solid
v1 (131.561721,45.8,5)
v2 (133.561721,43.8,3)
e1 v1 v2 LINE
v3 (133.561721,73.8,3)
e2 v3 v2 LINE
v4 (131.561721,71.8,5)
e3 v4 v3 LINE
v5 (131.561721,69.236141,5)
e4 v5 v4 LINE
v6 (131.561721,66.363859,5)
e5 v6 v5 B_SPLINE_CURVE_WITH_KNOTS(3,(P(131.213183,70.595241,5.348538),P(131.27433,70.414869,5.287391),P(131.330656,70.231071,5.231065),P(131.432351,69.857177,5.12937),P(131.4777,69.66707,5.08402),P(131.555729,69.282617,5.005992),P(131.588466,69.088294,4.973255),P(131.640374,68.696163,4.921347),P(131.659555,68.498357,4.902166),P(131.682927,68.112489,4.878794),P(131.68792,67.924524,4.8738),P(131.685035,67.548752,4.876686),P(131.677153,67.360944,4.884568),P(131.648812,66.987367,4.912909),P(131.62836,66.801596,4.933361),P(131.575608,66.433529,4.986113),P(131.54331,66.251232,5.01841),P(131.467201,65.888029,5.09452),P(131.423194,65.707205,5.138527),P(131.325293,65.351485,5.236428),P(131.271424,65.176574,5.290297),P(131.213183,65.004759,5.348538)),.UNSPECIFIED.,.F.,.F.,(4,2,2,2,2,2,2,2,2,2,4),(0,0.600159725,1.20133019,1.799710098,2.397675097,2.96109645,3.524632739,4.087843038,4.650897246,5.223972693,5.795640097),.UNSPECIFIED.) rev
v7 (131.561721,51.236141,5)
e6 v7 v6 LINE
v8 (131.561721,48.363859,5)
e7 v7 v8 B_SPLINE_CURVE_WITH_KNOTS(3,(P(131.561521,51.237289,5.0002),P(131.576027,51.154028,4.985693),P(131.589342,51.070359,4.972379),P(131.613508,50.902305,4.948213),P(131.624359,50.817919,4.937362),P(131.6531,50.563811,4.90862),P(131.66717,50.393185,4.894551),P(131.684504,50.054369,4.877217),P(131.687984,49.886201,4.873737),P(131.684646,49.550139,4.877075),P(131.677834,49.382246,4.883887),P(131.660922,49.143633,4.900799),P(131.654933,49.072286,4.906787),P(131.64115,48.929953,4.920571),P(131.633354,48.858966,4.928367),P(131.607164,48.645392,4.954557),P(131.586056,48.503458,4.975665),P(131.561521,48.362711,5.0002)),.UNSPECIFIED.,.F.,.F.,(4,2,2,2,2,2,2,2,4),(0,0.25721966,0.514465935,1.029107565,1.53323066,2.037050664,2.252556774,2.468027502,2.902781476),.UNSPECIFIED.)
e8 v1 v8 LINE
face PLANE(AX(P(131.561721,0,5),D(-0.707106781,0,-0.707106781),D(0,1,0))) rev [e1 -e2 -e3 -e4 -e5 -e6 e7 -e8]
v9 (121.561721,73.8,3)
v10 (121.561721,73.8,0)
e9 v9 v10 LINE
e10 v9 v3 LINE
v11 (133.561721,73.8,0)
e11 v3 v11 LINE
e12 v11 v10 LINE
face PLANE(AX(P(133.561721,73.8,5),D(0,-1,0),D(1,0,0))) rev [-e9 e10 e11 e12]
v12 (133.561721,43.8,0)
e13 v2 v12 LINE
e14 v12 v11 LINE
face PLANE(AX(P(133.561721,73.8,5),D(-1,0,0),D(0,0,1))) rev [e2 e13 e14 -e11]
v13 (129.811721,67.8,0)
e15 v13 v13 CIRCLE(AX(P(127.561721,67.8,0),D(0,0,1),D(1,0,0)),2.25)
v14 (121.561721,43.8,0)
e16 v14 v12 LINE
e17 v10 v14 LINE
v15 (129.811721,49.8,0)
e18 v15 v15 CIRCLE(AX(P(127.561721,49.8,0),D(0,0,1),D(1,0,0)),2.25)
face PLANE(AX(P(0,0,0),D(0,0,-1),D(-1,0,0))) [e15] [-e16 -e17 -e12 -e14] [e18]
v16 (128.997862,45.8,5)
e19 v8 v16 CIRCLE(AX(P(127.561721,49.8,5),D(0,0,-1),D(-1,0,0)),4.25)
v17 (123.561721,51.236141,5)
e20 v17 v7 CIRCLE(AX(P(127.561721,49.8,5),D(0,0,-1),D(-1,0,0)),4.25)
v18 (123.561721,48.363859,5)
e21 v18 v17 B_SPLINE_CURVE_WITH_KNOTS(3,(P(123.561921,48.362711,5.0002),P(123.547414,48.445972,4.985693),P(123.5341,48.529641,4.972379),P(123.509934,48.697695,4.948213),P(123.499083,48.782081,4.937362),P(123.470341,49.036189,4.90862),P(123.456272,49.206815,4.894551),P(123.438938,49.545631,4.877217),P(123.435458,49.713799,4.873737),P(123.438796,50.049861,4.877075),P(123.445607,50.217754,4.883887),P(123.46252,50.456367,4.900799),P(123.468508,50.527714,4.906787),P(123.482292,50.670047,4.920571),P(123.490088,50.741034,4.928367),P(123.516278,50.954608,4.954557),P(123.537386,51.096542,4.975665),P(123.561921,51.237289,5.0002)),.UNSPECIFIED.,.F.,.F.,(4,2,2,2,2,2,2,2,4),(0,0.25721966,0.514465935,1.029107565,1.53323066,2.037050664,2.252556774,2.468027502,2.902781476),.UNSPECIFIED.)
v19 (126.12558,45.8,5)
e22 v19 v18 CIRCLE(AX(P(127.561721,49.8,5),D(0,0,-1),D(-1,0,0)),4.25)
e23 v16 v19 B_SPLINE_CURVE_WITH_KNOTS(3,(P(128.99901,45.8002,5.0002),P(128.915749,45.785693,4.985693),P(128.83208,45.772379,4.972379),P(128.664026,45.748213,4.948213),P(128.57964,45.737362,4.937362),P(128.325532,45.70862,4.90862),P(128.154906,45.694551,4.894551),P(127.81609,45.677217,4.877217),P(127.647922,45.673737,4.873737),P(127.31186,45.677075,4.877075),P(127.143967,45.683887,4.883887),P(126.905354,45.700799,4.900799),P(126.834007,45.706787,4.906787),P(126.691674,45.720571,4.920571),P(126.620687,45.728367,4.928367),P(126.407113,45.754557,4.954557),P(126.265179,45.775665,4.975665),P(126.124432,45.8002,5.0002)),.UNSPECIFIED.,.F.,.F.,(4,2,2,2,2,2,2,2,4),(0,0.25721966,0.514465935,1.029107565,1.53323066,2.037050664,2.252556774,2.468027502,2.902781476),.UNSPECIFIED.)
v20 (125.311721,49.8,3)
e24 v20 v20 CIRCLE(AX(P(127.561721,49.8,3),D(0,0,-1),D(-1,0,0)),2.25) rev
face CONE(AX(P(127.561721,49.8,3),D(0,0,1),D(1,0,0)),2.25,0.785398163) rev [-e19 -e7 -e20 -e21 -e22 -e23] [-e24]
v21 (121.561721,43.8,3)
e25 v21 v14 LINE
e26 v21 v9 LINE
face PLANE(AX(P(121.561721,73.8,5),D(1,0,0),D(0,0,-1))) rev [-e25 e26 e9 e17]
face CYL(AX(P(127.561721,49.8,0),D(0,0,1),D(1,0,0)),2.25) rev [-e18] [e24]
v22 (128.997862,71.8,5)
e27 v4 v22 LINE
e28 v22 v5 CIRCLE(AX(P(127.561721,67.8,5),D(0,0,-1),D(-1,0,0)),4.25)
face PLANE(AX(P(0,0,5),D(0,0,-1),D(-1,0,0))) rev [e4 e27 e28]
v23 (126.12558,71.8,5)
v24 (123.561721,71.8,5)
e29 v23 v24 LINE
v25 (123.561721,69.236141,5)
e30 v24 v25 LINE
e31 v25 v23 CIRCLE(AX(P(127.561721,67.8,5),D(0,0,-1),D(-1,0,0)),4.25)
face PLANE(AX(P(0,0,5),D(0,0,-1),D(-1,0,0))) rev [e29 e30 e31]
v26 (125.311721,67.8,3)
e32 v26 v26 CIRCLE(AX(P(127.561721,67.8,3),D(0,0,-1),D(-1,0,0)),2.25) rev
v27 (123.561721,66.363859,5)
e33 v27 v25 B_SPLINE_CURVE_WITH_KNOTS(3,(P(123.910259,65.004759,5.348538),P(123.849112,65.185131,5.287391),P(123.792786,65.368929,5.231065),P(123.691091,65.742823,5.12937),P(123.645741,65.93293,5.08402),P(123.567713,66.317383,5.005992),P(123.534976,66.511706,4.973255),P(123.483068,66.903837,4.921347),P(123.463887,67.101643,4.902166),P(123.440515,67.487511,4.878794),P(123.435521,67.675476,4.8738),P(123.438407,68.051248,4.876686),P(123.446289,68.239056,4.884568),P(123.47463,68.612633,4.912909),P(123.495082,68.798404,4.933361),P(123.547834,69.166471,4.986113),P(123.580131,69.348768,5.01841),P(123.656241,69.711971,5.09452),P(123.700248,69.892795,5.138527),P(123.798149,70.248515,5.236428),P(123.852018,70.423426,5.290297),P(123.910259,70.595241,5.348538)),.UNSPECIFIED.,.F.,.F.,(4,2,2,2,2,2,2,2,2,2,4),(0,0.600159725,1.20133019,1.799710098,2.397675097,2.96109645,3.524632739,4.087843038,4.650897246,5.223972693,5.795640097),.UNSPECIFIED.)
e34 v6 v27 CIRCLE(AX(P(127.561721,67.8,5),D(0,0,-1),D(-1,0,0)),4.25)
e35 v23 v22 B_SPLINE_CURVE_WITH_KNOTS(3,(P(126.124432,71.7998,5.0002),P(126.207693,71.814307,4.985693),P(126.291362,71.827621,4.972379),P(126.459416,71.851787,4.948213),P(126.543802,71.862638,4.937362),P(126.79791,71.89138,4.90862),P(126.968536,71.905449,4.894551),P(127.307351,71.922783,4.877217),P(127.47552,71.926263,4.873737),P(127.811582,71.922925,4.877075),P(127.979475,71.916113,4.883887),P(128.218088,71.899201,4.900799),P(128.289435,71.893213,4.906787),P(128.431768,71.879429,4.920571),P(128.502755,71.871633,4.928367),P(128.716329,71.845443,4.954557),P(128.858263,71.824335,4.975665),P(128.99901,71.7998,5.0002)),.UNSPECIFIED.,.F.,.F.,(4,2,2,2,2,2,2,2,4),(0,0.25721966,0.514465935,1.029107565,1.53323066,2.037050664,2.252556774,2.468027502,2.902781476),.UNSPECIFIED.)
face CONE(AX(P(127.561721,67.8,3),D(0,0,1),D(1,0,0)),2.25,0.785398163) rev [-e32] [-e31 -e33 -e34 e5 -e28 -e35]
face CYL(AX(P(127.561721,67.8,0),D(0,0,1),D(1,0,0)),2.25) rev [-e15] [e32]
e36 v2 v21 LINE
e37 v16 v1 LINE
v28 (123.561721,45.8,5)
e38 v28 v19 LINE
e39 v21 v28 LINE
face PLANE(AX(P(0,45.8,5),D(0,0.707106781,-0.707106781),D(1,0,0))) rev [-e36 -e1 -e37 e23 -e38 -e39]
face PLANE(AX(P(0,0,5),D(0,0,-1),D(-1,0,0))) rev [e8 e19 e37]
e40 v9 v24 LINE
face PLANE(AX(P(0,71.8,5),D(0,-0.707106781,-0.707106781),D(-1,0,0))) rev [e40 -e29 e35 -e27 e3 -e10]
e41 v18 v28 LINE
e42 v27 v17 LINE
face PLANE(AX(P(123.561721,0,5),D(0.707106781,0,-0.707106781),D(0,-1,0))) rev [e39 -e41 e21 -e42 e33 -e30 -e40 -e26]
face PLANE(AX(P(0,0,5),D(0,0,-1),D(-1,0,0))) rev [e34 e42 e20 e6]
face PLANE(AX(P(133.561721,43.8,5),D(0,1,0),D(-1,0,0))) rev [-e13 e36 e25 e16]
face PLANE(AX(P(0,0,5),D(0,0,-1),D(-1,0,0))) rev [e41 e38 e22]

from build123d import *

# Parameters (mm, degrees)
SKETCH1_W           = 12
SKETCH1_H           = 30
BOSS_EXTRUDE1_DEPTH = 5
SKETCH2_R           = 2.25
CUT_EXTRUDE1_DEPTH  = 153.676695316
CHAMFER1_SIZE       = 2


with BuildPart() as part:
    # Sketch1 → Boss-Extrude1 (new body)
    with BuildSketch(Plane.XY):
        with Locations((127.56172091, 58.8)):
            Rectangle(SKETCH1_W, SKETCH1_H)
    extrude(amount=BOSS_EXTRUDE1_DEPTH)

    # Sketch2 → Cut-Extrude1 (cut, through all)
    with BuildSketch(Plane.XY.offset(5)):
        with Locations((127.56172091, 67.8)):
            Circle(SKETCH2_R)
        with Locations((127.56172091, 49.8)):
            Circle(SKETCH2_R)
    extrude(amount=-CUT_EXTRUDE1_DEPTH, mode=Mode.SUBTRACT)

    # Chamfer1
    # the kernel refuses this chamfer: 2 mm, written as the material it takes off along each edge
    with BuildSketch(Plane(origin=(133.56172091, 38.656634024, 5), x_dir=(0.027495876610582174, 0, -0.9996219169112968), z_dir=(0, 1, 0)), Plane(origin=(121.56172091, 78.943365976, 5), x_dir=(-0.02749587661058908, 0, -0.9996219169112968), z_dir=(0, -1, 0))) as chamfer1_piece_1:
        Polygon((CHAMFER1_SIZE * 0.999621916911, CHAMFER1_SIZE * 0.0274958766106), (-CHAMFER1_SIZE * 0.0274958766106, CHAMFER1_SIZE * 0.999621916911), (0, 0), align=None)
    extrude(amount=40.286731952, mode=Mode.SUBTRACT)
    with BuildSketch(Plane(origin=(127.56172091, 67.8, 5), x_dir=(1, 0, 0), z_dir=(0, -1, 0))) as chamfer1_piece_2:
        Polygon((2.25 + CHAMFER1_SIZE, 0), (2.25, -CHAMFER1_SIZE), (2.25, 0), align=None)
    revolve(axis=Axis((127.56172091, 67.8, 5), (0, 0, 1)), mode=Mode.SUBTRACT)
    with BuildSketch(Plane(origin=(138.705086886, 73.8, 5), x_dir=(0, 0.02749587661058908, -0.9996219169112968), z_dir=(-1, 0, 0))) as chamfer1_piece_3:
        Polygon((CHAMFER1_SIZE * 0.999621916911, CHAMFER1_SIZE * 0.0274958766106), (-CHAMFER1_SIZE * 0.0274958766106, CHAMFER1_SIZE * 0.999621916911), (0, 0), align=None)
    extrude(amount=22.286731952, mode=Mode.SUBTRACT)
    with BuildSketch(Plane(origin=(127.56172091, 49.8, 5), x_dir=(1, 0, 0), z_dir=(0, -1, 0))) as chamfer1_piece_4:
        Polygon((2.25 + CHAMFER1_SIZE, 0), (2.25, -CHAMFER1_SIZE), (2.25, 0), align=None)
    revolve(axis=Axis((127.56172091, 49.8, 5), (0, 0, 1)), mode=Mode.SUBTRACT)
    with BuildSketch(Plane(origin=(116.418354934, 43.8, 5), x_dir=(1.1837901526131779e-15, 0.9996219169112968, 0.02749587661058651), z_dir=(1, 0, 0))) as chamfer1_piece_5:
        Polygon((CHAMFER1_SIZE * 0.999621916911, -CHAMFER1_SIZE * 0.0274958766106), (-CHAMFER1_SIZE * 0.0274958766106, -CHAMFER1_SIZE * 0.999621916911), (0, 0), align=None)
    extrude(amount=22.286731952, mode=Mode.SUBTRACT)


solid = part.part
